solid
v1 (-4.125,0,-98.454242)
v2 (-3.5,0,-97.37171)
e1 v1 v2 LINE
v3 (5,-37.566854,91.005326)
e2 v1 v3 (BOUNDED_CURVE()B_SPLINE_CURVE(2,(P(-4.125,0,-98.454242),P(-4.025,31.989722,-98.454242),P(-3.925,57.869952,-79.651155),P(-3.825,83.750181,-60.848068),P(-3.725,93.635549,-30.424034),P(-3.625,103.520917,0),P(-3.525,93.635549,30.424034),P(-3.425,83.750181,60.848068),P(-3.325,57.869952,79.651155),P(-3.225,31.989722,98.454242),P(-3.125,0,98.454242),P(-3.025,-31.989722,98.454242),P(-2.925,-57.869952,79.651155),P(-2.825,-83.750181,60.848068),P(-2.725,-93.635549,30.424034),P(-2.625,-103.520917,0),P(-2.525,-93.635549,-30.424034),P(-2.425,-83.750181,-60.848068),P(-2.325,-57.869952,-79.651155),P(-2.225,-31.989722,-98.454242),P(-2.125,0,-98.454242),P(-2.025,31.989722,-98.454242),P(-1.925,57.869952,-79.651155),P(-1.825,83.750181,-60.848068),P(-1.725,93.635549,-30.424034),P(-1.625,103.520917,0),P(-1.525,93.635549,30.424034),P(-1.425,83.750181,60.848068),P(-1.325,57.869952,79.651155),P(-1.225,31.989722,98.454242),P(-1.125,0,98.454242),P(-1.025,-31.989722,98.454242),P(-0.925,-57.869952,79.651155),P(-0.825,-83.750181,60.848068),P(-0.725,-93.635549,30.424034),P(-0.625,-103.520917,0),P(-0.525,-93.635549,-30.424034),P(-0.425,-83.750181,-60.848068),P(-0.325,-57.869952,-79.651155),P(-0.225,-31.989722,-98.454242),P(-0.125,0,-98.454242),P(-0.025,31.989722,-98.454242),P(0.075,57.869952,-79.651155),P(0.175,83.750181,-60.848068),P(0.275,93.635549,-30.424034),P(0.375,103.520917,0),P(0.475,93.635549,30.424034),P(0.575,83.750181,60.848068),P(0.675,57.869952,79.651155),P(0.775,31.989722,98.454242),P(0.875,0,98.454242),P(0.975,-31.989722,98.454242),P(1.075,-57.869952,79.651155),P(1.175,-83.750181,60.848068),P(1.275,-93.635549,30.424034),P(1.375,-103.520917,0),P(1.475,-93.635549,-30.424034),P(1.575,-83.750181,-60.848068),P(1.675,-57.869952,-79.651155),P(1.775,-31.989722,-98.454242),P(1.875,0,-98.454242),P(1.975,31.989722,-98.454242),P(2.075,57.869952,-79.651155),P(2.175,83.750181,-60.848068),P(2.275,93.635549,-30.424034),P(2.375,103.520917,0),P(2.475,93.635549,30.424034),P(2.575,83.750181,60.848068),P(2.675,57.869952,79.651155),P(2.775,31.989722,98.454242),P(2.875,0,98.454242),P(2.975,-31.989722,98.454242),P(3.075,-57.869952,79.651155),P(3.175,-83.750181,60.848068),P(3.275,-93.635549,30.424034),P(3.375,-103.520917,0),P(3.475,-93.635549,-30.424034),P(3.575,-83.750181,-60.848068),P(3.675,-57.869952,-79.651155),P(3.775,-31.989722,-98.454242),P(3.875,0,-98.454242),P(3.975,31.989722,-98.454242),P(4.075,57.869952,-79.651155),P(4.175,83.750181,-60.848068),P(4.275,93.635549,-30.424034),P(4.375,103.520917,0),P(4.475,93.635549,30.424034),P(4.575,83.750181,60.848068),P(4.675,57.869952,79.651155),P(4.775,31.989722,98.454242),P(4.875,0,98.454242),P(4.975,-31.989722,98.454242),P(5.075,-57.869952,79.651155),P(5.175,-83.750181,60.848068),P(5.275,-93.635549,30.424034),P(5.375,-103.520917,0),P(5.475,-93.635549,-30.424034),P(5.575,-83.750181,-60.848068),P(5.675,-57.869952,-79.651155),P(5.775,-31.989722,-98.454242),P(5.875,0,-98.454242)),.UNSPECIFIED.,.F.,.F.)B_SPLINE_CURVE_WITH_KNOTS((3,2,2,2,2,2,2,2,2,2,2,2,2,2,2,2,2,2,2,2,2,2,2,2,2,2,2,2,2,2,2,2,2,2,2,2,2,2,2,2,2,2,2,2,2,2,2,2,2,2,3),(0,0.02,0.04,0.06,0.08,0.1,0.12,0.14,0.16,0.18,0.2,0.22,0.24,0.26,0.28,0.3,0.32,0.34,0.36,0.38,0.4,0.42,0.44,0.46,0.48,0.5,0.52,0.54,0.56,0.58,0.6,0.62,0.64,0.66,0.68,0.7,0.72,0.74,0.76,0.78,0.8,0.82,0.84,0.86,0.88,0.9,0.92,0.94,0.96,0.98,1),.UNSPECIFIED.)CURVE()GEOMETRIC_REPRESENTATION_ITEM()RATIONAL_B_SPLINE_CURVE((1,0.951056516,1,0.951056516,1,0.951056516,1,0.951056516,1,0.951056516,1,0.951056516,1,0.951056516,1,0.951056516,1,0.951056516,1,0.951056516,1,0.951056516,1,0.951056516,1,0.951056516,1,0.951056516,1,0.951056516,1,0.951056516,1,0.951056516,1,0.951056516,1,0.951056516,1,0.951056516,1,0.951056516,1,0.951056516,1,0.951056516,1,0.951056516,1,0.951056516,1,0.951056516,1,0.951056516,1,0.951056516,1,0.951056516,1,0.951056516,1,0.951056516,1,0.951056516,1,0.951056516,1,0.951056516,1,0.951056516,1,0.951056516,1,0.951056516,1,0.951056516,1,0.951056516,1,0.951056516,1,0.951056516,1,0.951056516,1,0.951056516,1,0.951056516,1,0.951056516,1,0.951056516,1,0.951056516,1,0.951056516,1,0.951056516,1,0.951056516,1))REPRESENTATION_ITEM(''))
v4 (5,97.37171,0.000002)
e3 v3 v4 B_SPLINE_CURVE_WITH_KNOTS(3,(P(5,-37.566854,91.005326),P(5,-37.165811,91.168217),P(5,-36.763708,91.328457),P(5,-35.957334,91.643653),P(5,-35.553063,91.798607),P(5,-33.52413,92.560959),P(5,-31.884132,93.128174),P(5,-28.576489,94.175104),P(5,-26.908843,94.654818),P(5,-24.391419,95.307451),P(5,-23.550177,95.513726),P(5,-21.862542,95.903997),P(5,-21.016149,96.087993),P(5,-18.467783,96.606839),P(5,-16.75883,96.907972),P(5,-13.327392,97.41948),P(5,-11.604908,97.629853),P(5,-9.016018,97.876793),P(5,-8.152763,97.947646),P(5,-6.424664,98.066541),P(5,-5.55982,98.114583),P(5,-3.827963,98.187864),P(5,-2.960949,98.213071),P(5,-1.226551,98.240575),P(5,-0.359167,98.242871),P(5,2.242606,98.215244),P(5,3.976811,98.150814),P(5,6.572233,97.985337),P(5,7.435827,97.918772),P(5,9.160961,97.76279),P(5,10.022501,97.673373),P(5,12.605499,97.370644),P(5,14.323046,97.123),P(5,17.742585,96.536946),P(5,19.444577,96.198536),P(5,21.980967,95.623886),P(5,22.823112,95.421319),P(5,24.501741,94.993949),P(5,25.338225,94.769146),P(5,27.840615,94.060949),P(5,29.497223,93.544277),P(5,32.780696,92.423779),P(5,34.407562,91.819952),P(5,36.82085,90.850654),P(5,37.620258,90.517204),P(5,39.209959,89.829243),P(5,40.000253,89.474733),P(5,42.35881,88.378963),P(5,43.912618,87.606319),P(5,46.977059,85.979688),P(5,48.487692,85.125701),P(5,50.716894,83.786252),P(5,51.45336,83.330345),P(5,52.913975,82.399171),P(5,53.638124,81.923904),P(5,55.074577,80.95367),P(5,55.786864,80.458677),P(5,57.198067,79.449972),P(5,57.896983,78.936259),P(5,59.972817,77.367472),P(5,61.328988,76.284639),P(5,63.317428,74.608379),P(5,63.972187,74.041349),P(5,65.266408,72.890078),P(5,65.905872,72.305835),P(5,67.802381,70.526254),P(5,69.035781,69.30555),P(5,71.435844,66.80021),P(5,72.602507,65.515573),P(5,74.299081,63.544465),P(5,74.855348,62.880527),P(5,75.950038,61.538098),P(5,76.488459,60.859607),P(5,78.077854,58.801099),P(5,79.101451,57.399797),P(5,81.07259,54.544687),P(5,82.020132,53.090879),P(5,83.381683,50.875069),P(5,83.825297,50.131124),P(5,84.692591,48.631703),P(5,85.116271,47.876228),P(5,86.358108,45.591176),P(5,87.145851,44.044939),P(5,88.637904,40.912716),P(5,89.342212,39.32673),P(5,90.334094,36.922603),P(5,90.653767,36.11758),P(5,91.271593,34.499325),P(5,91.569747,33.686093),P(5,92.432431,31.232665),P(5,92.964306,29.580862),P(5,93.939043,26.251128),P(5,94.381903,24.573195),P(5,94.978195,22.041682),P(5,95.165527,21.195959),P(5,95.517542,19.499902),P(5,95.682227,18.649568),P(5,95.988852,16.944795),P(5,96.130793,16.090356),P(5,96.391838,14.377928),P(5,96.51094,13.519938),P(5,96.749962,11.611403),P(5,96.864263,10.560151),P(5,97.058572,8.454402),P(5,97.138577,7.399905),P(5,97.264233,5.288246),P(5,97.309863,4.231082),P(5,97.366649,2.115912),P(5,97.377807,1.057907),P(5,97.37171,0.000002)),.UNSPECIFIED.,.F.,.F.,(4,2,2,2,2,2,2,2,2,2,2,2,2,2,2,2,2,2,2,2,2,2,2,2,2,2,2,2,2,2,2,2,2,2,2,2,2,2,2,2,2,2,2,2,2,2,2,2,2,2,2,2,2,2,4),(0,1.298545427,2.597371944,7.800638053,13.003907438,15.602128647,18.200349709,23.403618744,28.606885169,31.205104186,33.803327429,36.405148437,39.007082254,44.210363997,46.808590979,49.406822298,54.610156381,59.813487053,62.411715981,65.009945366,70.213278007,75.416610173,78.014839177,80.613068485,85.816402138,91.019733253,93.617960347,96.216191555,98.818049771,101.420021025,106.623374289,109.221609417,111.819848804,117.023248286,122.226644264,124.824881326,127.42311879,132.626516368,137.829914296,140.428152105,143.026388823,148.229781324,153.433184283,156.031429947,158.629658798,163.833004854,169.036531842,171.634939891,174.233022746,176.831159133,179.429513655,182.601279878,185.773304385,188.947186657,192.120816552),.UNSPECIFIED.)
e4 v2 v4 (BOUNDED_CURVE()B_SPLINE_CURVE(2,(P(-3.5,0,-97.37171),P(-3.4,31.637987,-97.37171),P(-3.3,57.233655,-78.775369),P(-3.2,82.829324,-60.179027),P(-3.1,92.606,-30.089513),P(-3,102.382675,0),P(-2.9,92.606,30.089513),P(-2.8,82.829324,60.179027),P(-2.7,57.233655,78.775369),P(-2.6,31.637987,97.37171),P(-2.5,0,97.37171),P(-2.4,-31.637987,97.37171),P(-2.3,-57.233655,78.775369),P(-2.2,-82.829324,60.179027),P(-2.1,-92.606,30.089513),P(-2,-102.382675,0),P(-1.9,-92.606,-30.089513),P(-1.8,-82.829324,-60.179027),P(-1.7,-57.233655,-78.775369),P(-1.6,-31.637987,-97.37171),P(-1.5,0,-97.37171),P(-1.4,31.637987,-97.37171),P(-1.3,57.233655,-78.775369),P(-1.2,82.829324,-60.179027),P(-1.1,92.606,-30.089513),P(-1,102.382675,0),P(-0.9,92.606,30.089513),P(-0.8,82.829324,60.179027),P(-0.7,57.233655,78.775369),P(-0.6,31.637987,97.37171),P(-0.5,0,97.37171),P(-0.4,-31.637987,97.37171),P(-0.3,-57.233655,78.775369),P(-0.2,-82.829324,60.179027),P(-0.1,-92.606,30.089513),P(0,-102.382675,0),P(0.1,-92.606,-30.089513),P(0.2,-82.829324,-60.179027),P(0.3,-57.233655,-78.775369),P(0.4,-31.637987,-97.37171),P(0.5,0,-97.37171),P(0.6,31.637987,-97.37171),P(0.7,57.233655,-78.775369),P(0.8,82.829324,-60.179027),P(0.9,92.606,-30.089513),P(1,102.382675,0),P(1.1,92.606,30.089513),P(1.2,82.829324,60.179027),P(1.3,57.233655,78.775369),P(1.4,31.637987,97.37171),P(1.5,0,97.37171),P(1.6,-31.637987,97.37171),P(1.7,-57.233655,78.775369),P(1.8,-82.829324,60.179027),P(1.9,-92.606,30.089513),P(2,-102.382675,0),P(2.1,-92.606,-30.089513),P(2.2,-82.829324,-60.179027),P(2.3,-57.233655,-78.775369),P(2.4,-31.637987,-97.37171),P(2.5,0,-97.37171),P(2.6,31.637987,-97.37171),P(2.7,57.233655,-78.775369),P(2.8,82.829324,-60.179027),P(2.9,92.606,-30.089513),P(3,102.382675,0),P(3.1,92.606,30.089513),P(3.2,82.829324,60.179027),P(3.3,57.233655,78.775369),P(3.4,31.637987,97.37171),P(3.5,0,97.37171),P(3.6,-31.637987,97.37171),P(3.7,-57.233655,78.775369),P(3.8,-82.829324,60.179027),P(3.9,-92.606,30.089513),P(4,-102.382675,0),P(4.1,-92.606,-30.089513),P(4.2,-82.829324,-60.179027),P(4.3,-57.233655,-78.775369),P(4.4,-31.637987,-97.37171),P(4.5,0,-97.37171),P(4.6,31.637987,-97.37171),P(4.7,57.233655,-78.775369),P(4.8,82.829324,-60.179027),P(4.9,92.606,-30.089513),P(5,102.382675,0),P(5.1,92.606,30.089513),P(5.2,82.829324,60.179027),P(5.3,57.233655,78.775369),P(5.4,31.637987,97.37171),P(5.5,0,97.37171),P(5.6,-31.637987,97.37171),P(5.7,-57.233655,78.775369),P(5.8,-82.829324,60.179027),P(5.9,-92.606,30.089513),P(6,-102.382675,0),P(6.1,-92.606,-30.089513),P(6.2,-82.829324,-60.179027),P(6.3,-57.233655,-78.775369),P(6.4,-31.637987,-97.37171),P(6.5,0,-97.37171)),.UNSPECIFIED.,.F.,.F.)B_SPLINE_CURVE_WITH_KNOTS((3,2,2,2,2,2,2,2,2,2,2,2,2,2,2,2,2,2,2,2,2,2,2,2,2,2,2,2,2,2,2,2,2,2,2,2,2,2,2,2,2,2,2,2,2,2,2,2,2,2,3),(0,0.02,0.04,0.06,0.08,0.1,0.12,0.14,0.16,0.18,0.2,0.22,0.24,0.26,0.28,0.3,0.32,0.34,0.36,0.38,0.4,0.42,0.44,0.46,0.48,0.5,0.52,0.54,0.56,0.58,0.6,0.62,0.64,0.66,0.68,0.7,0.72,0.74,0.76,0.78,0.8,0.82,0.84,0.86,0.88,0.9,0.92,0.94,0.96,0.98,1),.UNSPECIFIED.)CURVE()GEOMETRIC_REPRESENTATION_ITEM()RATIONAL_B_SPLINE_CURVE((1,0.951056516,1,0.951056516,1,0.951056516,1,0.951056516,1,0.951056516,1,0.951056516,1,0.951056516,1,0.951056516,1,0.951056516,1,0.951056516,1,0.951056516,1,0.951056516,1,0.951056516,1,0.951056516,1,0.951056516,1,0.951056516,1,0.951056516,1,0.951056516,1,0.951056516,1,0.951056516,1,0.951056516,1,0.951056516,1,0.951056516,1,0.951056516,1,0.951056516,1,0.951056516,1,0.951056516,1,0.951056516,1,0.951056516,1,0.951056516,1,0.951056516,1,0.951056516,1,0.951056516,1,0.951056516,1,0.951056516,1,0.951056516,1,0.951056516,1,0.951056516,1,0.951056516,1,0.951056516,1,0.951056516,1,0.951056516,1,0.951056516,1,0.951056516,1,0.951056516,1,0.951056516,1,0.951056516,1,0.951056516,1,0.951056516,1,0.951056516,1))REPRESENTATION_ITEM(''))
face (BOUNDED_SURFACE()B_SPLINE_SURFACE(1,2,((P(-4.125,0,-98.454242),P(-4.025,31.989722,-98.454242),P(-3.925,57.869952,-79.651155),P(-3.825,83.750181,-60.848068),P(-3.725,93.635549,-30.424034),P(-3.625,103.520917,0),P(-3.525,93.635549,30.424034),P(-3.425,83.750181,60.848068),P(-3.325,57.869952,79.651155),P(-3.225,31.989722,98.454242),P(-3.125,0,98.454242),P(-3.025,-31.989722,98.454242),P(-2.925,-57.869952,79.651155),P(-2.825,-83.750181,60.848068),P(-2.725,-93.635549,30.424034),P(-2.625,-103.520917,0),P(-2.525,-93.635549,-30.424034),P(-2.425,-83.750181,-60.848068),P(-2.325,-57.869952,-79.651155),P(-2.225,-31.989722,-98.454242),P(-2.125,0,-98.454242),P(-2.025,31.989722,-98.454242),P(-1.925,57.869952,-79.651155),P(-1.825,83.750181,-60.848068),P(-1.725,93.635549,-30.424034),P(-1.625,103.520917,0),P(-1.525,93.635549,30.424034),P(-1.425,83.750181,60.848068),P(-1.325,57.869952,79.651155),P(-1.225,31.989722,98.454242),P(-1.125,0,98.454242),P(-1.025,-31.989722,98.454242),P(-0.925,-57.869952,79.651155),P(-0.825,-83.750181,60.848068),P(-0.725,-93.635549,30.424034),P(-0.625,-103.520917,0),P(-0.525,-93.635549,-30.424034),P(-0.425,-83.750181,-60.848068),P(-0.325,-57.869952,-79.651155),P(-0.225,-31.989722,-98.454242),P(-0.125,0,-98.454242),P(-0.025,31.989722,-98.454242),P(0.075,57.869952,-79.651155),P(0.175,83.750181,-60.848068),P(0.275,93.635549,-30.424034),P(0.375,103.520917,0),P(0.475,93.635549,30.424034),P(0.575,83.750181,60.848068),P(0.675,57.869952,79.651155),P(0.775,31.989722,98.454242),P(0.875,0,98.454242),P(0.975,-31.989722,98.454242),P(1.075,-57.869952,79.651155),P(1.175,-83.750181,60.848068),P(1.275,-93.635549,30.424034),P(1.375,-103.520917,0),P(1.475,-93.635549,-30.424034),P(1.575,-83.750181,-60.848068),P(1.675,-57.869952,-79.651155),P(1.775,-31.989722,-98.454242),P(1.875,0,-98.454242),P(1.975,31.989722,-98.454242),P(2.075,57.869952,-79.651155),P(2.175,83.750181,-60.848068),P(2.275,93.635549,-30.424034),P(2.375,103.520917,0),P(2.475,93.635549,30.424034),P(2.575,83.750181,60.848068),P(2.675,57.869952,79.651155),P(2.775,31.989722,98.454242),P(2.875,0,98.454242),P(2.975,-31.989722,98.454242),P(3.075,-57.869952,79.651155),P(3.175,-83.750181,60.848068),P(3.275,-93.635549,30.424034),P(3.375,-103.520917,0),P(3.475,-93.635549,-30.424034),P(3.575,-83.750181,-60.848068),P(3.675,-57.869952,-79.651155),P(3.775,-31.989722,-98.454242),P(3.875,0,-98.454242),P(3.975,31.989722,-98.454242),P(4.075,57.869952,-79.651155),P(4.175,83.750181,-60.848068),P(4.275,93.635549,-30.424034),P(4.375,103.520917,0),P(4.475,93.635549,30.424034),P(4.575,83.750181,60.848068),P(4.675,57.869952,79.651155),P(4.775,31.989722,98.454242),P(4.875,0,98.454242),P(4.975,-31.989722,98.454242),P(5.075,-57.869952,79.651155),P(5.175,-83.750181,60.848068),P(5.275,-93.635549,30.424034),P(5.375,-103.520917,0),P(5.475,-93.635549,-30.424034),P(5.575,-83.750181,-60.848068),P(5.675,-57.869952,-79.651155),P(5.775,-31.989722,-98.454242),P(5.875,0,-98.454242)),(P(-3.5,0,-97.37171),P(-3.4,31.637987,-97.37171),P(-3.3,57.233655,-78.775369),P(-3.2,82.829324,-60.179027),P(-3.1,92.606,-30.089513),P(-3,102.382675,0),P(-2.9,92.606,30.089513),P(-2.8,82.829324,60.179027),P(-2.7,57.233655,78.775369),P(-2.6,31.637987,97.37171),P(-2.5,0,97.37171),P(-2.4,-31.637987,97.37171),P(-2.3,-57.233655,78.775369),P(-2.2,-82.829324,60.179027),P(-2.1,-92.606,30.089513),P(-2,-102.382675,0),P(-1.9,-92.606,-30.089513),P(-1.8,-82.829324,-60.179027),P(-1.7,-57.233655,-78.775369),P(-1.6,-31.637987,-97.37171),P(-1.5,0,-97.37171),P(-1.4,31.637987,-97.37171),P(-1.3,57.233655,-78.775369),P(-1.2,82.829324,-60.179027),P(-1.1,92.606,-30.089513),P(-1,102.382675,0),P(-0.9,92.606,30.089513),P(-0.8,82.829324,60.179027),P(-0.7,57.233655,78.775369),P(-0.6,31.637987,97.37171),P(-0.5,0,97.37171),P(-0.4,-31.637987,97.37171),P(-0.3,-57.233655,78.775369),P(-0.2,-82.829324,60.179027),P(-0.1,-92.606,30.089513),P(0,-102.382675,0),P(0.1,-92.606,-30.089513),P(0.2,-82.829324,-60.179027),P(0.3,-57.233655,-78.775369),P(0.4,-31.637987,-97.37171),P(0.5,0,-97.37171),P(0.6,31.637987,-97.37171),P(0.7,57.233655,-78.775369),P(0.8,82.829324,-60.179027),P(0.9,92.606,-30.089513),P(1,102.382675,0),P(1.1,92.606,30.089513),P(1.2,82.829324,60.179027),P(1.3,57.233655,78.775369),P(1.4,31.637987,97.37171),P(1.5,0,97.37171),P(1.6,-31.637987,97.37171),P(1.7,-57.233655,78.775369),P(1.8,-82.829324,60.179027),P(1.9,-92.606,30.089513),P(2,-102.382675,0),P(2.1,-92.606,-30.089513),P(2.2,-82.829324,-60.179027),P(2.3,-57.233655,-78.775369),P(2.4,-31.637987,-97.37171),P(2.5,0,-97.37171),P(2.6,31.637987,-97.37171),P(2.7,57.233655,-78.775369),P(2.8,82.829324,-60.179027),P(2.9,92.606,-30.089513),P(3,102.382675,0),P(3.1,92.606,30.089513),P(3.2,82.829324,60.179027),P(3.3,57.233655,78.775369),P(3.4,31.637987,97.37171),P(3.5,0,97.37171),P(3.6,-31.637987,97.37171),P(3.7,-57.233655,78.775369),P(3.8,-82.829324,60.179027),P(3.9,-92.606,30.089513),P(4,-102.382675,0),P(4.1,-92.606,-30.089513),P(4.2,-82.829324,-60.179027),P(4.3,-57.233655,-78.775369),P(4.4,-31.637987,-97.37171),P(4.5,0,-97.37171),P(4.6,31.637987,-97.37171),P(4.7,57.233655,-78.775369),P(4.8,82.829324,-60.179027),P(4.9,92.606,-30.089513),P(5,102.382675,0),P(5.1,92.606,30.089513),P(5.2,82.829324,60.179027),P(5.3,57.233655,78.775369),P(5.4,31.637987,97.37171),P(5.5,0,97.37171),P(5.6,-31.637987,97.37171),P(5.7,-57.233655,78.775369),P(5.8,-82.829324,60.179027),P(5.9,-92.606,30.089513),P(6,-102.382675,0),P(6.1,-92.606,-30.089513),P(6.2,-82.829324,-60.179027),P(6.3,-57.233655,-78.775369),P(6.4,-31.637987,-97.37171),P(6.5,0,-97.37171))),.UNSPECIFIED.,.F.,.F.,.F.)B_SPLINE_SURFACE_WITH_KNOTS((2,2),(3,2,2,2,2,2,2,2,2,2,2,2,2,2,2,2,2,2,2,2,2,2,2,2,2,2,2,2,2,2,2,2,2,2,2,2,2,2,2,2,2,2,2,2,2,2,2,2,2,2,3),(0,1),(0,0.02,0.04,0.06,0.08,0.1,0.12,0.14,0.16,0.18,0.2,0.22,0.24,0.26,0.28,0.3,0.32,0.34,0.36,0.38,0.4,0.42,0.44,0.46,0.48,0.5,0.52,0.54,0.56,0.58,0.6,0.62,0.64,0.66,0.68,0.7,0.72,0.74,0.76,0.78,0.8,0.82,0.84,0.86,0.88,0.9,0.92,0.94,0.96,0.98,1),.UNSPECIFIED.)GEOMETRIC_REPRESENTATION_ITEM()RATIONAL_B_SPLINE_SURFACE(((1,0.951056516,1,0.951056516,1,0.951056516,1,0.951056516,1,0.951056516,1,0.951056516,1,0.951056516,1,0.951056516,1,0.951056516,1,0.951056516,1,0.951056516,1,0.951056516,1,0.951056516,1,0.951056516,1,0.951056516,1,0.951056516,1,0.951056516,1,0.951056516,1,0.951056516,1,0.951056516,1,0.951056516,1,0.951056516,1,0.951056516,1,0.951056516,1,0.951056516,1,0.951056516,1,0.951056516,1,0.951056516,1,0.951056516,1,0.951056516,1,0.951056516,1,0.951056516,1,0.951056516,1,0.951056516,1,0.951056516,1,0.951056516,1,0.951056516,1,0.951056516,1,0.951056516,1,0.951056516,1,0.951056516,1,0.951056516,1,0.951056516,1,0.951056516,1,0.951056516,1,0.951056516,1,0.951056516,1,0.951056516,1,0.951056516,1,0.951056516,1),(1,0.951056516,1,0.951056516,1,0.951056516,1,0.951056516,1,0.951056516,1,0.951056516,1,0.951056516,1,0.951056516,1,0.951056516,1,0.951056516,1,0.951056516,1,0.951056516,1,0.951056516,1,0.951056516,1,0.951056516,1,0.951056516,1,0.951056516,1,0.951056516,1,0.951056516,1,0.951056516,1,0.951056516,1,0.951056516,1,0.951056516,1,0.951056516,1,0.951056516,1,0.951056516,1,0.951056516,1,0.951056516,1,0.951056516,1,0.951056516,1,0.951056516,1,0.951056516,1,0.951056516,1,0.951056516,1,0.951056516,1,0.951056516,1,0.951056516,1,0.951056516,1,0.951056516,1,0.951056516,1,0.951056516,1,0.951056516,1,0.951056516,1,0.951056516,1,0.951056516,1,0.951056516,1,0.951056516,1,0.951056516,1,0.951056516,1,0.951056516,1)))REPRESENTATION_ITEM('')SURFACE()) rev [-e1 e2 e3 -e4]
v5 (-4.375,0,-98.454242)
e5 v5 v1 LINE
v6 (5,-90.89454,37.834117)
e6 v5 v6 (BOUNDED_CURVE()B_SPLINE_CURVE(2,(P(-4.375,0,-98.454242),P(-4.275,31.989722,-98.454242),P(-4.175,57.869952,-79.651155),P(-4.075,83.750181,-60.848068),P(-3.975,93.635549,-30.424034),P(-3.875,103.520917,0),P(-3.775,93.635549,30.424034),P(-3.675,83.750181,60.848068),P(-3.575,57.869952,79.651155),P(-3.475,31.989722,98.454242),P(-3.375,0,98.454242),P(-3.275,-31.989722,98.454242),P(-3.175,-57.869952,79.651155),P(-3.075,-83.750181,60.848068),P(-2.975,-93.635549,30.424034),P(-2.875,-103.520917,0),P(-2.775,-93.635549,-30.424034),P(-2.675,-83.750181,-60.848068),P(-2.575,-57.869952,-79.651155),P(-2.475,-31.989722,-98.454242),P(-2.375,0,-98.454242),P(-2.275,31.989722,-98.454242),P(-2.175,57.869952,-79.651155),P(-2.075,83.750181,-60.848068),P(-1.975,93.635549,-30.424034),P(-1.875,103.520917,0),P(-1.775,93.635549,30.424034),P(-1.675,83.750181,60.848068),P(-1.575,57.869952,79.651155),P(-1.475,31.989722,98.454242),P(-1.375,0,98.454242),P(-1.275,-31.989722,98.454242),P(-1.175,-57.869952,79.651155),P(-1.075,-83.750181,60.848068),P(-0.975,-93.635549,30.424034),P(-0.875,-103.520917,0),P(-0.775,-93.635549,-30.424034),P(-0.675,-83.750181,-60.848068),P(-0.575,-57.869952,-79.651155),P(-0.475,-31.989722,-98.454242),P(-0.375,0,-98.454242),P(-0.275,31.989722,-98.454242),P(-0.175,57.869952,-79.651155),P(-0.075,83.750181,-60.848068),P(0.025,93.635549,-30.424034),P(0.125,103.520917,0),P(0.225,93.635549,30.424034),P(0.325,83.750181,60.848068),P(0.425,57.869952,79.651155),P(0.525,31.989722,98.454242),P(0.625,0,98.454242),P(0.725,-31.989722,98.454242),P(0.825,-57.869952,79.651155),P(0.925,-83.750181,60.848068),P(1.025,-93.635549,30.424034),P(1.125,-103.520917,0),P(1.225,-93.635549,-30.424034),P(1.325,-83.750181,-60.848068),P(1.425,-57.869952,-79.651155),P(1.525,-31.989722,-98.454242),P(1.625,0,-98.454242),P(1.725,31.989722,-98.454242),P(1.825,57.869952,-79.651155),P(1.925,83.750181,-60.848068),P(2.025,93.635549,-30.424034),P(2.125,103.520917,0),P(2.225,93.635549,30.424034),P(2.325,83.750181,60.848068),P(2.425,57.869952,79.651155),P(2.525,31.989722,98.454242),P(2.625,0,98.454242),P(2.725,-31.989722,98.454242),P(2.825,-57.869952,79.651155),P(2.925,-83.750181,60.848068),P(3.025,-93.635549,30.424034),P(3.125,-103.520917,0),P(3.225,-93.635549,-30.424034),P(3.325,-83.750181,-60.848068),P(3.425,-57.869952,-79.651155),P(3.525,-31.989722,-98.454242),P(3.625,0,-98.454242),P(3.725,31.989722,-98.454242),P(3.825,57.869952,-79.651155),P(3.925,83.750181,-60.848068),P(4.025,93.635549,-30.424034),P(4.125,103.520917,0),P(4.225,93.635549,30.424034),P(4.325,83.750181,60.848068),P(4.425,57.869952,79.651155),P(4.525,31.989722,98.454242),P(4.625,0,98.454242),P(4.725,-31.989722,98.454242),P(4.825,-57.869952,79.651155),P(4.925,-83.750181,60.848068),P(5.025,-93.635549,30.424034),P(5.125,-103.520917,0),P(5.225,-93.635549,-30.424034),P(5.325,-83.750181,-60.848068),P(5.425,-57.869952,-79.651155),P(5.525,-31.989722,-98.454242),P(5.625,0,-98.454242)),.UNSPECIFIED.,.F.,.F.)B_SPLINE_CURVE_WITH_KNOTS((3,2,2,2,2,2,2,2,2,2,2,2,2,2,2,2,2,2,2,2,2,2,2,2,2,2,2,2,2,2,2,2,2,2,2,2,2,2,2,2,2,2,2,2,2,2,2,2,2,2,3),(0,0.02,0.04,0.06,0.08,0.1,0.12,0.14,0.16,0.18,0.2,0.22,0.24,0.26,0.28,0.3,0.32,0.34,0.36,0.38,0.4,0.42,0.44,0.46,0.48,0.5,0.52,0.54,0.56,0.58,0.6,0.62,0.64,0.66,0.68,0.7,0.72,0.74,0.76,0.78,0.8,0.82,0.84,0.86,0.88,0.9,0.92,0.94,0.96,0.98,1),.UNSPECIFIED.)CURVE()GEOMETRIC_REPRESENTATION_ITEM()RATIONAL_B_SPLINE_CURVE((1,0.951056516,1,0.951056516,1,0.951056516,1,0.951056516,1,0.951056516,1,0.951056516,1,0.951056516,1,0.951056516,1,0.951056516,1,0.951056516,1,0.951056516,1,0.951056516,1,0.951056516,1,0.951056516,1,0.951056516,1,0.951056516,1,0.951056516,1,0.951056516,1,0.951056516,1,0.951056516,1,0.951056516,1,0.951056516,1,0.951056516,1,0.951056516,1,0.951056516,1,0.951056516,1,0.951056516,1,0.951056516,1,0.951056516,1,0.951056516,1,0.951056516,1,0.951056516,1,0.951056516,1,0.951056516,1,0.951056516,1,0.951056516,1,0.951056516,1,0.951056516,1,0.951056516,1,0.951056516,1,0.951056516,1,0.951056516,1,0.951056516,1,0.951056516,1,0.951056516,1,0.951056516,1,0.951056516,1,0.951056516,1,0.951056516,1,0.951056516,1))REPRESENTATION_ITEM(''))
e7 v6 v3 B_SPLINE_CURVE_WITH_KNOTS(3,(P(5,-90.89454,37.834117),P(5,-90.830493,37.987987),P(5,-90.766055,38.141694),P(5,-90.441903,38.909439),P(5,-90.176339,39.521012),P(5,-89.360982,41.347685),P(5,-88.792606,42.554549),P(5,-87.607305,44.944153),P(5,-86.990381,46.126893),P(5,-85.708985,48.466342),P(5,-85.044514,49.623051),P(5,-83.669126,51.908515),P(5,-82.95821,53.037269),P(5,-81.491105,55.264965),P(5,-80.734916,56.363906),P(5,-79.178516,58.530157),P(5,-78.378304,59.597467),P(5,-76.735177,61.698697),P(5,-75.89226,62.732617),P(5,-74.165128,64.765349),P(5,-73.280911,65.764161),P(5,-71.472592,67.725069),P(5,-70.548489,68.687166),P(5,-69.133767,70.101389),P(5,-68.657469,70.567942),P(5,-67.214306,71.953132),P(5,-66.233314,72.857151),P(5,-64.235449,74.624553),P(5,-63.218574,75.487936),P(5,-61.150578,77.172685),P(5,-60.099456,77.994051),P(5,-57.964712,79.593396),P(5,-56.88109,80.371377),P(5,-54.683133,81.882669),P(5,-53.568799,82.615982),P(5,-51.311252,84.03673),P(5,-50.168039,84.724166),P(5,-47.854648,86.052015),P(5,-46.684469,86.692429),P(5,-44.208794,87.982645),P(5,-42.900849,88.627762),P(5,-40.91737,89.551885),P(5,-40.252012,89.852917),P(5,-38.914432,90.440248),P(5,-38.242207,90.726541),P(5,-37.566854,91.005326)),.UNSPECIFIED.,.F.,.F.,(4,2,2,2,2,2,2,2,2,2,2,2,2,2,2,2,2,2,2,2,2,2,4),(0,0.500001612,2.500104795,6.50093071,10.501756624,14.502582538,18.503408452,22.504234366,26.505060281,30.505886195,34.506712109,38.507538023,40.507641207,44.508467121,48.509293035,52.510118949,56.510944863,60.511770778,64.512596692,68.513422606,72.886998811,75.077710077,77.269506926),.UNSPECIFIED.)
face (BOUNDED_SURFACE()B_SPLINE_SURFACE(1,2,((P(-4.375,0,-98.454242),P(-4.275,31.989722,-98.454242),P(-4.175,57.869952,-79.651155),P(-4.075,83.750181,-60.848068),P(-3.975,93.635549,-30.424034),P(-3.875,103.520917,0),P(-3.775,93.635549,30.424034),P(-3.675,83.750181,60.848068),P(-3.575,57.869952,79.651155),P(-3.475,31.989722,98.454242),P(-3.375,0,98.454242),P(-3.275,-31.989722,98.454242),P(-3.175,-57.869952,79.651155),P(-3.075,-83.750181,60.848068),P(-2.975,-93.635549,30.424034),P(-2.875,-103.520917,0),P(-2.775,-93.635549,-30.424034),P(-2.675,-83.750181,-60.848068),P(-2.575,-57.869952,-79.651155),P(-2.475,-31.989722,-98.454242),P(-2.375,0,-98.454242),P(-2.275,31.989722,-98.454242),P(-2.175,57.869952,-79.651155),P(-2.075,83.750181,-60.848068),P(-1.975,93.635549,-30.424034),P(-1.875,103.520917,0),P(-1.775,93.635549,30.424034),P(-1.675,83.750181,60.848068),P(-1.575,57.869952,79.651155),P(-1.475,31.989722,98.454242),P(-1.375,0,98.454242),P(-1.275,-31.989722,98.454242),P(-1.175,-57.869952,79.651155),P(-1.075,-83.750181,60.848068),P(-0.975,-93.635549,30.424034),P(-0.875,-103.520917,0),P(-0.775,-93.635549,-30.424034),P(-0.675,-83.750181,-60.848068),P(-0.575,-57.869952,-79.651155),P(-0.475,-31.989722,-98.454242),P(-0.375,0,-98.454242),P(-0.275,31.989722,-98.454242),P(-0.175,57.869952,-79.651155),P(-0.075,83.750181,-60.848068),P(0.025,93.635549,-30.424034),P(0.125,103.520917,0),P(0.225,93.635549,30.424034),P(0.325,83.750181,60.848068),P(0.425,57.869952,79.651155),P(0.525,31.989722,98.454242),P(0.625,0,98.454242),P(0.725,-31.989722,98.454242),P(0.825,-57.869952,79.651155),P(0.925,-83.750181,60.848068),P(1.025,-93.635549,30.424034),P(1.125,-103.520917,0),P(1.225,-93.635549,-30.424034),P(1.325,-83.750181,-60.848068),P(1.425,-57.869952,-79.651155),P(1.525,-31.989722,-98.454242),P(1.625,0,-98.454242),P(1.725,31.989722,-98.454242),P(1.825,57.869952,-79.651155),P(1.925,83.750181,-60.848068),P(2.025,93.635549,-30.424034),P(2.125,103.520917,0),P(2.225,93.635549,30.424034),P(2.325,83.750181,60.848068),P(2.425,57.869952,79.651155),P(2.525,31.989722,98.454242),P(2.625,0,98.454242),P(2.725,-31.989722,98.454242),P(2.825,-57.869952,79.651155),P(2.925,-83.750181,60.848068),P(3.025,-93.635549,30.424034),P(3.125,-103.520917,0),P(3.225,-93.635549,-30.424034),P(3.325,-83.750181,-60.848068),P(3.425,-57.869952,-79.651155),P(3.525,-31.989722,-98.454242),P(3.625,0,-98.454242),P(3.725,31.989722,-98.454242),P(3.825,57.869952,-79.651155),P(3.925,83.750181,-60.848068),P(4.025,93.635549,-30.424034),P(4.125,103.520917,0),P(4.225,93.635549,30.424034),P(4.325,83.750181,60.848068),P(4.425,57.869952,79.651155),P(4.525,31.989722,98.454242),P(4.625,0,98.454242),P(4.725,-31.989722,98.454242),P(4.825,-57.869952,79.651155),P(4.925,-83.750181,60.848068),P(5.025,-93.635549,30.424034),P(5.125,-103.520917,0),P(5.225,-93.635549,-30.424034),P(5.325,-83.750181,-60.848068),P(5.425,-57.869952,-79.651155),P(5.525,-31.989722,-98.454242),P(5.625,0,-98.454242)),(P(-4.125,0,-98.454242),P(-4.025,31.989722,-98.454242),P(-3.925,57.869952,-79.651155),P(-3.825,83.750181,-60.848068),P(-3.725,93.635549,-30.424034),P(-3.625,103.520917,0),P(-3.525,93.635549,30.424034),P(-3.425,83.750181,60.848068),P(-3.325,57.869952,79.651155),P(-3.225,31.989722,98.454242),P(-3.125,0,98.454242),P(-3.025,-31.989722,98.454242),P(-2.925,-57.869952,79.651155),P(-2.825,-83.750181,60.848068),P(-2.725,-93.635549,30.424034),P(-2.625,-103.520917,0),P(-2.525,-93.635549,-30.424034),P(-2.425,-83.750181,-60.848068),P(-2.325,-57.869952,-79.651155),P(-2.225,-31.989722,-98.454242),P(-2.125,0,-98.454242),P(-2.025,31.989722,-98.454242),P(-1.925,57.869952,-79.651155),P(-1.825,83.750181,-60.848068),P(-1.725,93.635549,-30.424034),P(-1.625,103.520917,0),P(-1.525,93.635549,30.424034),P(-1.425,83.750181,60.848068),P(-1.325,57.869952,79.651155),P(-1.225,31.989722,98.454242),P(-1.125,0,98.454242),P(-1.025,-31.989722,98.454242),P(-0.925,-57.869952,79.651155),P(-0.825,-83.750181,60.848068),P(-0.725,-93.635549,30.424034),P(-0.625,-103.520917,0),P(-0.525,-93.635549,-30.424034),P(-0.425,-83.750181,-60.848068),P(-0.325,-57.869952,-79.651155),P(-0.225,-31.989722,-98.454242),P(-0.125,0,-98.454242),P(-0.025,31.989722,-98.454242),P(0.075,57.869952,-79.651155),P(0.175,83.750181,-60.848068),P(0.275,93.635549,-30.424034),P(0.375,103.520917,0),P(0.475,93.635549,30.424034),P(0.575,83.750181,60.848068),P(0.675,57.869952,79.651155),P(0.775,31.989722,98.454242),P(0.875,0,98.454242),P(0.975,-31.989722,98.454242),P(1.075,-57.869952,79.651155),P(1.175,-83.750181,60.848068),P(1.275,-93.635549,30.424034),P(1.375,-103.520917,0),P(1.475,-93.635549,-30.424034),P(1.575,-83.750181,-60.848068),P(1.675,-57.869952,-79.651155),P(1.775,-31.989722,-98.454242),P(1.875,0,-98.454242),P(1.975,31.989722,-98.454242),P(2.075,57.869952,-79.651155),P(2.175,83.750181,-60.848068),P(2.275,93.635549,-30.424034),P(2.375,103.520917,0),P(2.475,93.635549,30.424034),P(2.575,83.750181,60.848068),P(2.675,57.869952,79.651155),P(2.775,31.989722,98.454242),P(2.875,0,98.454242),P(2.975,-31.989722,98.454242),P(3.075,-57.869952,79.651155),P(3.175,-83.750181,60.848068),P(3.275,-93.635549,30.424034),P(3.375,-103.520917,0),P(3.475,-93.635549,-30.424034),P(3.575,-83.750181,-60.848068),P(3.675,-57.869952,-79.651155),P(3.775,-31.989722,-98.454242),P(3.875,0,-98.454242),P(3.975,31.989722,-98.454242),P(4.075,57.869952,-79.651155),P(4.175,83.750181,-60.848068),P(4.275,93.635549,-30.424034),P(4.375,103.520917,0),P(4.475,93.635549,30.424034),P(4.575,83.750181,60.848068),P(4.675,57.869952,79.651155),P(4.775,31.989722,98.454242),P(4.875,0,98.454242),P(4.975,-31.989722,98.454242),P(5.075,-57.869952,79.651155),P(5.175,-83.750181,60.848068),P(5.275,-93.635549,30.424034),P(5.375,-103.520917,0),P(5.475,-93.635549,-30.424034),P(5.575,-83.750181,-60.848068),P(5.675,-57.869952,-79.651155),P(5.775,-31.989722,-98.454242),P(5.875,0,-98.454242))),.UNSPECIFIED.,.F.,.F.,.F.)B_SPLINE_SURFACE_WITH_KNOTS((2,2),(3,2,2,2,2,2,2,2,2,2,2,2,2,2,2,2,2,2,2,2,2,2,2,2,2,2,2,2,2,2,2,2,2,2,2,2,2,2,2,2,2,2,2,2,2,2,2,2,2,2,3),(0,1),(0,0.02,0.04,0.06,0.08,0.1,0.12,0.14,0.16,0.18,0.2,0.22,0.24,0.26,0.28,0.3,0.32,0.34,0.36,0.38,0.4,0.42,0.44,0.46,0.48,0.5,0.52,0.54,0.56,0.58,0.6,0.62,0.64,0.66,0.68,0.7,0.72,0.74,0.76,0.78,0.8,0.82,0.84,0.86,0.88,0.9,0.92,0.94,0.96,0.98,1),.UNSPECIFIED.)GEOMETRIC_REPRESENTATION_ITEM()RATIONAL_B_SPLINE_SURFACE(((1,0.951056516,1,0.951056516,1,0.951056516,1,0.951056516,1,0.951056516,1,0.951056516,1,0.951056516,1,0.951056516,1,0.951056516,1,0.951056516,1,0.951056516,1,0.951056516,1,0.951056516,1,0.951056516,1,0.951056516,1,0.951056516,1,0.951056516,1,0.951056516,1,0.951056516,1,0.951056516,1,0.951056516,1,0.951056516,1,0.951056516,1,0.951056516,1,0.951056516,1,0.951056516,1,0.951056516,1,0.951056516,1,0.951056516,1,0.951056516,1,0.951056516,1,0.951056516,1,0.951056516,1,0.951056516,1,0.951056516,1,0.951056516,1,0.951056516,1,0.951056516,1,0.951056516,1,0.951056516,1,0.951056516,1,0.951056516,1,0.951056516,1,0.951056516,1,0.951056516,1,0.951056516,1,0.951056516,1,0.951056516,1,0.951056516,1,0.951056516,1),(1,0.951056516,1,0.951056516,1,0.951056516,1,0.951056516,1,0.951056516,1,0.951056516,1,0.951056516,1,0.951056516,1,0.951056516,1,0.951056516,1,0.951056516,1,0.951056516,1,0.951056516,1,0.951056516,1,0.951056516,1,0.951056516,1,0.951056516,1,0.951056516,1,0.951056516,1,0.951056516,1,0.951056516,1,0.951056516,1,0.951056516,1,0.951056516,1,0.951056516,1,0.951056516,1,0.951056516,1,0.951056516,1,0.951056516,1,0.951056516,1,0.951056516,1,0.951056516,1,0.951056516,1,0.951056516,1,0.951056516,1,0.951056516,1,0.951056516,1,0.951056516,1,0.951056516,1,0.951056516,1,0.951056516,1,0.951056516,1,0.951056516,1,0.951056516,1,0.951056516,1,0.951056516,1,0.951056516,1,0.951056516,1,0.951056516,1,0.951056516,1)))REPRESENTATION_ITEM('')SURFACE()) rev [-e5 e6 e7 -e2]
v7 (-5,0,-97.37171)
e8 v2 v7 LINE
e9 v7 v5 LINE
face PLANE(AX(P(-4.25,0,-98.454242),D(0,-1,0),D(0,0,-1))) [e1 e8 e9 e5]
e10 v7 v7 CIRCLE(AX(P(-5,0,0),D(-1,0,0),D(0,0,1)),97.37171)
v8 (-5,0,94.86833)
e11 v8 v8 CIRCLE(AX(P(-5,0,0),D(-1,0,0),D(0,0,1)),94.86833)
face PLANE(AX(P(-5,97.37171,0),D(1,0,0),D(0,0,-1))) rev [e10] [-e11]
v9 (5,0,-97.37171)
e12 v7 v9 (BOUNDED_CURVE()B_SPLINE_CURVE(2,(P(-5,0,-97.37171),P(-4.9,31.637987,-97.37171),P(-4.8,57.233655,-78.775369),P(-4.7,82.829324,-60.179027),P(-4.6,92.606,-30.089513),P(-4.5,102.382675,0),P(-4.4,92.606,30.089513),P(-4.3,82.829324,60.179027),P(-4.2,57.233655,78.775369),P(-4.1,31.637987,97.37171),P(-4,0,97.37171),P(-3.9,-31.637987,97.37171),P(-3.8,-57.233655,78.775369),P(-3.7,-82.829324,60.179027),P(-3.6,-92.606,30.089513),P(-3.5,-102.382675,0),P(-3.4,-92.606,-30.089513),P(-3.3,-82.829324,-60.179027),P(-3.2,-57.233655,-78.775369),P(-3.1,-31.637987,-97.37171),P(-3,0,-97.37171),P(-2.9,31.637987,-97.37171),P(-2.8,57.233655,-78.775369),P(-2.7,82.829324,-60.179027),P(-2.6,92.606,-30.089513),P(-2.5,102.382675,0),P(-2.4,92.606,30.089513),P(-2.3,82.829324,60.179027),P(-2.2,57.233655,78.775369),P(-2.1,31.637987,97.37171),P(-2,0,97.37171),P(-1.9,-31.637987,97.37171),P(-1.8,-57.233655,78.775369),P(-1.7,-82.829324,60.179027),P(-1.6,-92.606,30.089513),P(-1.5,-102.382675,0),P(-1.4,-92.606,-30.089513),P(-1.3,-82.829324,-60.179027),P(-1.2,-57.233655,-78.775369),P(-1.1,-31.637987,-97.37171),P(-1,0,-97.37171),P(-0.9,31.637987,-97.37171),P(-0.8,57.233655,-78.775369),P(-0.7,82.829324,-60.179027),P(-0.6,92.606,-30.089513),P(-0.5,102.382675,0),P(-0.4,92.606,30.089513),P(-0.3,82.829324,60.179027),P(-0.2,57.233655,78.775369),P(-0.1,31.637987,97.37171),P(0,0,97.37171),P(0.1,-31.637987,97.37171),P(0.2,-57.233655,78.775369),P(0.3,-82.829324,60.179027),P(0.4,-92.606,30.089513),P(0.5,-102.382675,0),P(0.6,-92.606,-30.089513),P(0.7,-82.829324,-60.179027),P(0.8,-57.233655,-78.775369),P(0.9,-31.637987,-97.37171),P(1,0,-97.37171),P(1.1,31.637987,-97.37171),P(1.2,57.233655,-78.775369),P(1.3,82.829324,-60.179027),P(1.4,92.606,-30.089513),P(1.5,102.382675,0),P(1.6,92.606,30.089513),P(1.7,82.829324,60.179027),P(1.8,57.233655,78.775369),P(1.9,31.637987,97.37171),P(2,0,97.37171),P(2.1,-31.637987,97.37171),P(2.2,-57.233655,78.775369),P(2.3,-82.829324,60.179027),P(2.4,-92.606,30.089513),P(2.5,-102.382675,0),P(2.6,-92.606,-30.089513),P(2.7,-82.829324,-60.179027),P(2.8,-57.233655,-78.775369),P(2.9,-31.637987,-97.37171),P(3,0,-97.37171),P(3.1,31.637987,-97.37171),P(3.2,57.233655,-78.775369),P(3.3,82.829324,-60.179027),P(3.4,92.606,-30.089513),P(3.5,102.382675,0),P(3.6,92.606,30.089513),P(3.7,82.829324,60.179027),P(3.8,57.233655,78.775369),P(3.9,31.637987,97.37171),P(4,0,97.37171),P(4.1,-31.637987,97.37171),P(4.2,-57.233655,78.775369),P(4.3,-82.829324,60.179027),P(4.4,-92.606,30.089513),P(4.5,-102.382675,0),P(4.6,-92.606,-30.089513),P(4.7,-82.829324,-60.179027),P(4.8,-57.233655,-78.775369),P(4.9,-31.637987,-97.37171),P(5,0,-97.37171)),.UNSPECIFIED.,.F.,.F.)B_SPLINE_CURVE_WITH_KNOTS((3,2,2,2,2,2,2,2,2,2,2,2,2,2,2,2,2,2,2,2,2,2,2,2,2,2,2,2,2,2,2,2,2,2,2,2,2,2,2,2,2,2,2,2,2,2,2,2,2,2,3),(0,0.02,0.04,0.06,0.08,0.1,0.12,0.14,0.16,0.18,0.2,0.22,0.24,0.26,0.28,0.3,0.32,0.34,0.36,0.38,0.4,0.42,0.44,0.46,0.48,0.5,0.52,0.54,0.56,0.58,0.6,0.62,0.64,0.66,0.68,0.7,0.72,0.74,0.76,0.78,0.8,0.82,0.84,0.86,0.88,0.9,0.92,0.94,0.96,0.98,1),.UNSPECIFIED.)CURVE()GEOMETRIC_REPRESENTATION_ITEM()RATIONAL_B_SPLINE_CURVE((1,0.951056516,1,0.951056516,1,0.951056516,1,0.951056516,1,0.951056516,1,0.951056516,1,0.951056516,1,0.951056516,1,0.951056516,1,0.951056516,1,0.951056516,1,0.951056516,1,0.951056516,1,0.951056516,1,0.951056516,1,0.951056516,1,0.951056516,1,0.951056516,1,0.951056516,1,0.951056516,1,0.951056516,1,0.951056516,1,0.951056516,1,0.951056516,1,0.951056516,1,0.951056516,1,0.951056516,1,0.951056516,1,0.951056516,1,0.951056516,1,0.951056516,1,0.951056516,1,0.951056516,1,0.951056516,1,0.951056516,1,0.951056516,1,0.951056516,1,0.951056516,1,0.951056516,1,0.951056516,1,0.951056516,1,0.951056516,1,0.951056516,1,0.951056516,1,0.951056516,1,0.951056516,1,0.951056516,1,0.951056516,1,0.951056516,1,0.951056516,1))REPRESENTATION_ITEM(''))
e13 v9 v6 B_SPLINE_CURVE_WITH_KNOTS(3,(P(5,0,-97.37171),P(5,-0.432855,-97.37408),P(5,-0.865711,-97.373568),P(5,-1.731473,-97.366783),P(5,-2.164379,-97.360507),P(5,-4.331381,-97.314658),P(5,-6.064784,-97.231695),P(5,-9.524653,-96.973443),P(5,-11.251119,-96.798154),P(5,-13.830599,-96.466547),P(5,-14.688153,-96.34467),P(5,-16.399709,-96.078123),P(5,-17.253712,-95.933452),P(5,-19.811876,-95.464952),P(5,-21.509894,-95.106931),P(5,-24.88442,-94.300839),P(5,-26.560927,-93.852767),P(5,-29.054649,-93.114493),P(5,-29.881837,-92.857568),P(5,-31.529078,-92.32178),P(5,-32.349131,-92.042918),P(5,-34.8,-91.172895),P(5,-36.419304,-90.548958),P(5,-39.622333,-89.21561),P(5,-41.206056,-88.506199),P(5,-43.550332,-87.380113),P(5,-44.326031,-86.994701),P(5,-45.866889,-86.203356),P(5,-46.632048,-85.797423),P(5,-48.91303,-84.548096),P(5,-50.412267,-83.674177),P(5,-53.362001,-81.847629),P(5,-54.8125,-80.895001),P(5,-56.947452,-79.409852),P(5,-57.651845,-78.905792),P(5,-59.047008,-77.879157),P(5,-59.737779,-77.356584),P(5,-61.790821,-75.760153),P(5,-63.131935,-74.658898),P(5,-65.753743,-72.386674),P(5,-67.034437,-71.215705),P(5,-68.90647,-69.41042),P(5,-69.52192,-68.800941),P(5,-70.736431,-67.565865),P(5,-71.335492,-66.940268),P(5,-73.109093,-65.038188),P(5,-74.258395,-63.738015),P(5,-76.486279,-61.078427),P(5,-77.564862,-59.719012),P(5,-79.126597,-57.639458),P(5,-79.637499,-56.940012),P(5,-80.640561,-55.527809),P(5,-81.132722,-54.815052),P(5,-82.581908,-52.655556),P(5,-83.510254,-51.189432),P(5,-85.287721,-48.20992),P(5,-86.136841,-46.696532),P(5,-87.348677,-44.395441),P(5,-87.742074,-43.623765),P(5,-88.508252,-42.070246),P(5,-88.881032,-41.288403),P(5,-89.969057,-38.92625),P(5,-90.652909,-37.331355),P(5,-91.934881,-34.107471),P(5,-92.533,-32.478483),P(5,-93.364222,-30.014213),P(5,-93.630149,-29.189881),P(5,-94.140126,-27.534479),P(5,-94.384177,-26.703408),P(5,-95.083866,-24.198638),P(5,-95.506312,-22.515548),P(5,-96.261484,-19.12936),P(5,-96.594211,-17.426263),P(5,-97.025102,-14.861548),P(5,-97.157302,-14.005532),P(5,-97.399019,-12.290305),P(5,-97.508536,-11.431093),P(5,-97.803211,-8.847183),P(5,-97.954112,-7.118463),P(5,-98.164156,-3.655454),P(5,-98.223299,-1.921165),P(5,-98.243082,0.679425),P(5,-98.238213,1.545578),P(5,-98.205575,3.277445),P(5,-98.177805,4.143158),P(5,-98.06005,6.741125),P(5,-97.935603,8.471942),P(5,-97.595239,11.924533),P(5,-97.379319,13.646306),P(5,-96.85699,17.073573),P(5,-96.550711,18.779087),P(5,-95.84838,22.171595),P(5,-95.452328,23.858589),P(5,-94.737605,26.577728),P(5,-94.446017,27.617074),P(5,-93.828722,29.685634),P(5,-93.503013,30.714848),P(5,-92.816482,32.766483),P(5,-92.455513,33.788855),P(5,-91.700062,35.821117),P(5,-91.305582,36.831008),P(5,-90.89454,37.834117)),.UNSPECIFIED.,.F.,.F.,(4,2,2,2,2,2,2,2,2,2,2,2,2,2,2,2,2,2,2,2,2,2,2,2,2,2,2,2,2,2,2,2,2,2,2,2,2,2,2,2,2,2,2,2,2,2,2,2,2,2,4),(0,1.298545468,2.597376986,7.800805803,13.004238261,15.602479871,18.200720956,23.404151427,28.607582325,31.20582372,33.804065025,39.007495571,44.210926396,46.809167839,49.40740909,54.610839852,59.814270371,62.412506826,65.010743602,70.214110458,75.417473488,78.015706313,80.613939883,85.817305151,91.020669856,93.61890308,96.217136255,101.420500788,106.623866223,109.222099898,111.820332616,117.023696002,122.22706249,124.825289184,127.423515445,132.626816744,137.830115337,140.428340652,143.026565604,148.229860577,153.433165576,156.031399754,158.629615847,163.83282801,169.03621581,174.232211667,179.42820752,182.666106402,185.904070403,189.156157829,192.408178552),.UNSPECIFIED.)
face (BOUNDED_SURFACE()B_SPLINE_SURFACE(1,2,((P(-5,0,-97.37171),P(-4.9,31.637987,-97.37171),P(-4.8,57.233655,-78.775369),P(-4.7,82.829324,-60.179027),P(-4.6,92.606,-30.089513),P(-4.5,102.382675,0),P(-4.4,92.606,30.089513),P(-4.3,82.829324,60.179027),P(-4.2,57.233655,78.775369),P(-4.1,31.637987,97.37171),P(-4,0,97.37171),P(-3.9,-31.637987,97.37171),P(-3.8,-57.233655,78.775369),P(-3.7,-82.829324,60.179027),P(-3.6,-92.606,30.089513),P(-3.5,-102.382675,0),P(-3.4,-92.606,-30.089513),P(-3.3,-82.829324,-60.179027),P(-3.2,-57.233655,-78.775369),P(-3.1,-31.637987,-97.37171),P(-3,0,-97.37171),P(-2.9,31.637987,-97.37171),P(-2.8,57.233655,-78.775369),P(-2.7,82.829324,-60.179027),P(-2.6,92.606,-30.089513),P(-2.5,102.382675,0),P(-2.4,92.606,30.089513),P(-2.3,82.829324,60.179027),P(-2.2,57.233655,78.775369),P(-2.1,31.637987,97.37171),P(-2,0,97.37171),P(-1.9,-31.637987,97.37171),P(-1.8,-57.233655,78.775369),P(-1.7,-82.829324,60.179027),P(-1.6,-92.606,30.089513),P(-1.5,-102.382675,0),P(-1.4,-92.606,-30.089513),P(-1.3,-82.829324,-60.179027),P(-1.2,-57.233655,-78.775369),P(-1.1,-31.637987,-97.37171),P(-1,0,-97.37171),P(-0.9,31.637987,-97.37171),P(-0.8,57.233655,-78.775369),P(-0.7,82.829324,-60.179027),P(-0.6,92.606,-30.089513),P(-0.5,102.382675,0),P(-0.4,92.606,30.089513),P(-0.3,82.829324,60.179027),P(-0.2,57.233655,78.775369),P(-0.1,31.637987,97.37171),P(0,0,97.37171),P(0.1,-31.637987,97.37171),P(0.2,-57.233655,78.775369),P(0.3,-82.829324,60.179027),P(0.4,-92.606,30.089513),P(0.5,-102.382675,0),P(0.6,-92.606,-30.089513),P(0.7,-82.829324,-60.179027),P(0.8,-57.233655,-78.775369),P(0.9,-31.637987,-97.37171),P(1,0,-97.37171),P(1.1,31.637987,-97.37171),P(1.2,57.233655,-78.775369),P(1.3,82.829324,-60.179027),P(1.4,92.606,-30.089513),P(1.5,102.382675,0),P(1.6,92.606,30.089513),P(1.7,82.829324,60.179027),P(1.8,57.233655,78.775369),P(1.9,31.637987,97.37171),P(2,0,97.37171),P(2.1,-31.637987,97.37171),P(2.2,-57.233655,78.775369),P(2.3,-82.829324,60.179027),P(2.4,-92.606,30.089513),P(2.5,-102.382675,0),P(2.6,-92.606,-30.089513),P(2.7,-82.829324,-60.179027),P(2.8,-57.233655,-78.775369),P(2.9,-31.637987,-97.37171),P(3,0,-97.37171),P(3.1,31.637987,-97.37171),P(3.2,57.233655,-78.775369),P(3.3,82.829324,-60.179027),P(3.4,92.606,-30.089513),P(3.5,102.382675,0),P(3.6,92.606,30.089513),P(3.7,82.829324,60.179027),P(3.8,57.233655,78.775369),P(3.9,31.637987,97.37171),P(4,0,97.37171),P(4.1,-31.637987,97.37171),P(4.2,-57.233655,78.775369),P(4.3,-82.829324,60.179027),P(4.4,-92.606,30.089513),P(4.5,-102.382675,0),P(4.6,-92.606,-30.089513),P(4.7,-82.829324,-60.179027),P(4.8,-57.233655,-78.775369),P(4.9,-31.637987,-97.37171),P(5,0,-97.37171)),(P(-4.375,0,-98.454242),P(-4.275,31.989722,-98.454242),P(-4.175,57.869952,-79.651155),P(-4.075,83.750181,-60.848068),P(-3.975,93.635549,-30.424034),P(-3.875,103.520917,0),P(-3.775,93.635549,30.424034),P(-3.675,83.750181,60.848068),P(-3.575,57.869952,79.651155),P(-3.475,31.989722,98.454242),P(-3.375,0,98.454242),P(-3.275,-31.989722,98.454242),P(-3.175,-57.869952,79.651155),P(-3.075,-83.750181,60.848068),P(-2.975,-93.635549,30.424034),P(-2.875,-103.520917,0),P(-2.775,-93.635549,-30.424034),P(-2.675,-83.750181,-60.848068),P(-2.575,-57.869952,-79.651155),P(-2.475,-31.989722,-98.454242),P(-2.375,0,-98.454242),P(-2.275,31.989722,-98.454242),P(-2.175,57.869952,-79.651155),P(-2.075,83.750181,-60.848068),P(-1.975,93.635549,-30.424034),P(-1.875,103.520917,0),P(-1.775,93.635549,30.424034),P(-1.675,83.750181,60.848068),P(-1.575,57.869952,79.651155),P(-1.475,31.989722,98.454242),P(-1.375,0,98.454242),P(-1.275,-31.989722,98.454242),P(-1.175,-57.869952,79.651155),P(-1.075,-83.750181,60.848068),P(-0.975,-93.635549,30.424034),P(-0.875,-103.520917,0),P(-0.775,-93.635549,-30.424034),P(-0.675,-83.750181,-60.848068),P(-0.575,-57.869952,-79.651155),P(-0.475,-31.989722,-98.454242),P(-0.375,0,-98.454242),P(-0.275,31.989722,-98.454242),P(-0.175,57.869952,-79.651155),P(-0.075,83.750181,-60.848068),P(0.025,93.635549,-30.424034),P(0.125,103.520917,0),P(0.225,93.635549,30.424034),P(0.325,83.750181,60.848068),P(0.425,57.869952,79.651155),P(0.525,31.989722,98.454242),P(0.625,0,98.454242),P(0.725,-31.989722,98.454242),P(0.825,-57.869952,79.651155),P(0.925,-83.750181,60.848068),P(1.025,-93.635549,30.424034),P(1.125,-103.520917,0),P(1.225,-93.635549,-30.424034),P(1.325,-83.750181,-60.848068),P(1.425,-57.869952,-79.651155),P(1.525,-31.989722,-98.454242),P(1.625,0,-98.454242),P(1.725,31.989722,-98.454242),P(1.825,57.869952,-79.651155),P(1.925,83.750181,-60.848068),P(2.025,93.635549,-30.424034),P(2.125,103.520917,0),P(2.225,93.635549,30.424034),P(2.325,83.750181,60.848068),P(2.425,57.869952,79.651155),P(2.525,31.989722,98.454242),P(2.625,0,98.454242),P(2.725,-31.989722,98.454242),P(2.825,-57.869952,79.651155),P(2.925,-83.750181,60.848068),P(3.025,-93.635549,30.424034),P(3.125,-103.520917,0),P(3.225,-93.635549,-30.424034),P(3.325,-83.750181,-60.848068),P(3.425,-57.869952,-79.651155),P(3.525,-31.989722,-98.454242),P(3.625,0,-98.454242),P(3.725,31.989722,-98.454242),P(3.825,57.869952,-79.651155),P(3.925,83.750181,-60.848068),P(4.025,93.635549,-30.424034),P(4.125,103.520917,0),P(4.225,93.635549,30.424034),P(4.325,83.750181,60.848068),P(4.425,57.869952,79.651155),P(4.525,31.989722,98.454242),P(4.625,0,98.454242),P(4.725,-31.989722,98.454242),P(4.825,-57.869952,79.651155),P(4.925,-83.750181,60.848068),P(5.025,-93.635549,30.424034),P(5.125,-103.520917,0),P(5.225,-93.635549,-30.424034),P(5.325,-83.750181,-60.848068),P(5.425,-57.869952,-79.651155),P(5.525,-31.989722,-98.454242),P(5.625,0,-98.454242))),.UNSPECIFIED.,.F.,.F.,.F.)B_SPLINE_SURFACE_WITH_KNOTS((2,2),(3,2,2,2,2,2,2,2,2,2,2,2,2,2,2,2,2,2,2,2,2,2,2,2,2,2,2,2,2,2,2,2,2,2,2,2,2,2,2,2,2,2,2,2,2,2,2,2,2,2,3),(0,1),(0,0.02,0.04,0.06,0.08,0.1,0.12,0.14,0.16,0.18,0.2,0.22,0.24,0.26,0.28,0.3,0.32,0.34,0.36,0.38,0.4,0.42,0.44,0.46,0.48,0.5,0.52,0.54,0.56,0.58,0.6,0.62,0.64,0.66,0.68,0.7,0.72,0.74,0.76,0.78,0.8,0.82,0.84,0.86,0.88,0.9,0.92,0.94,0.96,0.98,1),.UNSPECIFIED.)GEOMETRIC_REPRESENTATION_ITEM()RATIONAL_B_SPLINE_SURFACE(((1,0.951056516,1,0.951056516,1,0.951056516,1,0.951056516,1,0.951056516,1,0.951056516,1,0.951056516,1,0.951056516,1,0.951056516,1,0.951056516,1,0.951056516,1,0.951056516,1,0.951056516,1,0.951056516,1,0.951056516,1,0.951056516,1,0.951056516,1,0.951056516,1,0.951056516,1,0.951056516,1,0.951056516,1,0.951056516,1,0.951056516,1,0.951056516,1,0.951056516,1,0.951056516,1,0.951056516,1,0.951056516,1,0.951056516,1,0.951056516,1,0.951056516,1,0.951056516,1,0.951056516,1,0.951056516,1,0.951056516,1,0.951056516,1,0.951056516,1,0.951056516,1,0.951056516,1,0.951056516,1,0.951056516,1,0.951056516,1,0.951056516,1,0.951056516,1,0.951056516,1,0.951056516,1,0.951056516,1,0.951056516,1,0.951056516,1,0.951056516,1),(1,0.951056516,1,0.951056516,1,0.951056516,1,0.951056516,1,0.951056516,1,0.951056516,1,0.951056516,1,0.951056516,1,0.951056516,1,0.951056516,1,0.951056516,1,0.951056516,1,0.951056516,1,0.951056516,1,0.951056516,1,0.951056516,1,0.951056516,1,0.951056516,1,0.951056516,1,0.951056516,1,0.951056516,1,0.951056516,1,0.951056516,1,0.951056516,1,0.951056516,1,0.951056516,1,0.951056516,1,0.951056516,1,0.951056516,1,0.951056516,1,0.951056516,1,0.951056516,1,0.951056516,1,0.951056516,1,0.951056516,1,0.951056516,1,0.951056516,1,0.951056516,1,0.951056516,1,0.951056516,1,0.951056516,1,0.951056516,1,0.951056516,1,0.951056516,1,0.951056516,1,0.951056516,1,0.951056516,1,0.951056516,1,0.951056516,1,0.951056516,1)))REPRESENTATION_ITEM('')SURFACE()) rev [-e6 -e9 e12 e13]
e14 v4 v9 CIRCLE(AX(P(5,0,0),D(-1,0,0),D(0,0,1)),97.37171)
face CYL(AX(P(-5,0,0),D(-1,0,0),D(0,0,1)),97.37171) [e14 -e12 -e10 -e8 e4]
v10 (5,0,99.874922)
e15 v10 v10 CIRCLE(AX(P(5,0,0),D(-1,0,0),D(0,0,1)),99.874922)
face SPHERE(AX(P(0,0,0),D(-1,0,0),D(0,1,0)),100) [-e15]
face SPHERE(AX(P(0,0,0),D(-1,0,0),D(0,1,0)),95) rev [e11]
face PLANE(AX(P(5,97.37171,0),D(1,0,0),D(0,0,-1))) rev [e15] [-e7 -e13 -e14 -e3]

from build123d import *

# Parameters (mm, degrees)
THREAD1_PITCH = 2


with BuildPart() as part:
    # Sketch1 → Revolve3 (revolve)
    with BuildSketch(Plane.XY):
        with BuildLine():
            Line((-5, 97.371710471), (-5, 94.868329805))
            ThreePointArc((-5, 94.868329805), (65.383484153, 68.92024376), (95, 0))
            Line((95, 0), (100, 0))
            ThreePointArc((100, 0), (72.456883731, 68.92024376), (5, 99.874921777))
            Line((5, 99.874921777), (5, 97.371710471))
            Line((5, 97.371710471), (-5, 97.371710471))
        make_face()
    revolve(axis=Axis((-5, 0, 0), (1, 0, 0)))

    # Thread1: arcs per turn and ends read off the stored shape
    # Thread1: the profile of Thread Profile2 profile screwed along a right-hand helix through 5 turns, 10 arcs to a turn; built about Z, then put on its axis
    thread1_z = Axis((0, 0, 0), (0, 0, 1))
    thread1_corners = [(97.371410471, 0, -0.000173205), (98.454242221, 0, 0.624999997), (98.454242221, 0, 0.874999997), (97.371410471, 0, 1.5001732)]
    with BuildLine(mode=Mode.PRIVATE) as thread1_profile:
        Line(thread1_corners[0], thread1_corners[1])
        Line(thread1_corners[1], thread1_corners[2])
        Line(thread1_corners[2], thread1_corners[3])
        Line(thread1_corners[3], thread1_corners[0])
    thread1_cap = Face(thread1_profile.wire())
    thread1_turn_angles = [0, 18, 36, 54, 72, 90, 108, 126, 144, 162, 180, 198, 216, 234, 252, 270, 288, 306, 324, 342, 360]
    thread1_turn_weights = [1, 0.9510565162951535, 1, 0.9510565162951535, 1, 0.9510565162951535, 1, 0.9510565162951535, 1, 0.9510565162951535, 1, 0.9510565162951535, 1, 0.9510565162951535, 1, 0.9510565162951535, 1, 0.9510565162951535, 1, 0.9510565162951535, 1]
    thread1_turn_rails = [Edge.make_bspline([Vector(p[0], p[1], 0).rotate(thread1_z, thread1_turn_angles[k]) / thread1_turn_weights[k] + Vector(0, 0, p[2] + THREAD1_PITCH * thread1_turn_angles[k] / 360) for k in range(21)], [0, 0, 0, 1, 1, 2, 2, 3, 3, 4, 4, 5, 5, 6, 6, 7, 7, 8, 8, 9, 9, 10, 10, 10], 2, thread1_turn_weights) for p in thread1_corners]
    thread1_turn_sides = [Face.make_surface_from_curves(thread1_turn_rails[p[0]], thread1_turn_rails[p[1]]) for p in [(0, 1), (1, 2), (2, 3), (3, 0)]]
    thread1 = Plane(origin=(-5, 0, 0), x_dir=(0, 0, -1), z_dir=(1, 0, 0)) * Solid(Shell([*[p.moved(Location((0, 0, THREAD1_PITCH * i))) for i in range(5) for p in thread1_turn_sides], thread1_cap, thread1_cap.rotate(thread1_z, 1800).moved(Location((0, 0, THREAD1_PITCH * 1800 / 360)))]))
    add(thread1)


solid = part.part
